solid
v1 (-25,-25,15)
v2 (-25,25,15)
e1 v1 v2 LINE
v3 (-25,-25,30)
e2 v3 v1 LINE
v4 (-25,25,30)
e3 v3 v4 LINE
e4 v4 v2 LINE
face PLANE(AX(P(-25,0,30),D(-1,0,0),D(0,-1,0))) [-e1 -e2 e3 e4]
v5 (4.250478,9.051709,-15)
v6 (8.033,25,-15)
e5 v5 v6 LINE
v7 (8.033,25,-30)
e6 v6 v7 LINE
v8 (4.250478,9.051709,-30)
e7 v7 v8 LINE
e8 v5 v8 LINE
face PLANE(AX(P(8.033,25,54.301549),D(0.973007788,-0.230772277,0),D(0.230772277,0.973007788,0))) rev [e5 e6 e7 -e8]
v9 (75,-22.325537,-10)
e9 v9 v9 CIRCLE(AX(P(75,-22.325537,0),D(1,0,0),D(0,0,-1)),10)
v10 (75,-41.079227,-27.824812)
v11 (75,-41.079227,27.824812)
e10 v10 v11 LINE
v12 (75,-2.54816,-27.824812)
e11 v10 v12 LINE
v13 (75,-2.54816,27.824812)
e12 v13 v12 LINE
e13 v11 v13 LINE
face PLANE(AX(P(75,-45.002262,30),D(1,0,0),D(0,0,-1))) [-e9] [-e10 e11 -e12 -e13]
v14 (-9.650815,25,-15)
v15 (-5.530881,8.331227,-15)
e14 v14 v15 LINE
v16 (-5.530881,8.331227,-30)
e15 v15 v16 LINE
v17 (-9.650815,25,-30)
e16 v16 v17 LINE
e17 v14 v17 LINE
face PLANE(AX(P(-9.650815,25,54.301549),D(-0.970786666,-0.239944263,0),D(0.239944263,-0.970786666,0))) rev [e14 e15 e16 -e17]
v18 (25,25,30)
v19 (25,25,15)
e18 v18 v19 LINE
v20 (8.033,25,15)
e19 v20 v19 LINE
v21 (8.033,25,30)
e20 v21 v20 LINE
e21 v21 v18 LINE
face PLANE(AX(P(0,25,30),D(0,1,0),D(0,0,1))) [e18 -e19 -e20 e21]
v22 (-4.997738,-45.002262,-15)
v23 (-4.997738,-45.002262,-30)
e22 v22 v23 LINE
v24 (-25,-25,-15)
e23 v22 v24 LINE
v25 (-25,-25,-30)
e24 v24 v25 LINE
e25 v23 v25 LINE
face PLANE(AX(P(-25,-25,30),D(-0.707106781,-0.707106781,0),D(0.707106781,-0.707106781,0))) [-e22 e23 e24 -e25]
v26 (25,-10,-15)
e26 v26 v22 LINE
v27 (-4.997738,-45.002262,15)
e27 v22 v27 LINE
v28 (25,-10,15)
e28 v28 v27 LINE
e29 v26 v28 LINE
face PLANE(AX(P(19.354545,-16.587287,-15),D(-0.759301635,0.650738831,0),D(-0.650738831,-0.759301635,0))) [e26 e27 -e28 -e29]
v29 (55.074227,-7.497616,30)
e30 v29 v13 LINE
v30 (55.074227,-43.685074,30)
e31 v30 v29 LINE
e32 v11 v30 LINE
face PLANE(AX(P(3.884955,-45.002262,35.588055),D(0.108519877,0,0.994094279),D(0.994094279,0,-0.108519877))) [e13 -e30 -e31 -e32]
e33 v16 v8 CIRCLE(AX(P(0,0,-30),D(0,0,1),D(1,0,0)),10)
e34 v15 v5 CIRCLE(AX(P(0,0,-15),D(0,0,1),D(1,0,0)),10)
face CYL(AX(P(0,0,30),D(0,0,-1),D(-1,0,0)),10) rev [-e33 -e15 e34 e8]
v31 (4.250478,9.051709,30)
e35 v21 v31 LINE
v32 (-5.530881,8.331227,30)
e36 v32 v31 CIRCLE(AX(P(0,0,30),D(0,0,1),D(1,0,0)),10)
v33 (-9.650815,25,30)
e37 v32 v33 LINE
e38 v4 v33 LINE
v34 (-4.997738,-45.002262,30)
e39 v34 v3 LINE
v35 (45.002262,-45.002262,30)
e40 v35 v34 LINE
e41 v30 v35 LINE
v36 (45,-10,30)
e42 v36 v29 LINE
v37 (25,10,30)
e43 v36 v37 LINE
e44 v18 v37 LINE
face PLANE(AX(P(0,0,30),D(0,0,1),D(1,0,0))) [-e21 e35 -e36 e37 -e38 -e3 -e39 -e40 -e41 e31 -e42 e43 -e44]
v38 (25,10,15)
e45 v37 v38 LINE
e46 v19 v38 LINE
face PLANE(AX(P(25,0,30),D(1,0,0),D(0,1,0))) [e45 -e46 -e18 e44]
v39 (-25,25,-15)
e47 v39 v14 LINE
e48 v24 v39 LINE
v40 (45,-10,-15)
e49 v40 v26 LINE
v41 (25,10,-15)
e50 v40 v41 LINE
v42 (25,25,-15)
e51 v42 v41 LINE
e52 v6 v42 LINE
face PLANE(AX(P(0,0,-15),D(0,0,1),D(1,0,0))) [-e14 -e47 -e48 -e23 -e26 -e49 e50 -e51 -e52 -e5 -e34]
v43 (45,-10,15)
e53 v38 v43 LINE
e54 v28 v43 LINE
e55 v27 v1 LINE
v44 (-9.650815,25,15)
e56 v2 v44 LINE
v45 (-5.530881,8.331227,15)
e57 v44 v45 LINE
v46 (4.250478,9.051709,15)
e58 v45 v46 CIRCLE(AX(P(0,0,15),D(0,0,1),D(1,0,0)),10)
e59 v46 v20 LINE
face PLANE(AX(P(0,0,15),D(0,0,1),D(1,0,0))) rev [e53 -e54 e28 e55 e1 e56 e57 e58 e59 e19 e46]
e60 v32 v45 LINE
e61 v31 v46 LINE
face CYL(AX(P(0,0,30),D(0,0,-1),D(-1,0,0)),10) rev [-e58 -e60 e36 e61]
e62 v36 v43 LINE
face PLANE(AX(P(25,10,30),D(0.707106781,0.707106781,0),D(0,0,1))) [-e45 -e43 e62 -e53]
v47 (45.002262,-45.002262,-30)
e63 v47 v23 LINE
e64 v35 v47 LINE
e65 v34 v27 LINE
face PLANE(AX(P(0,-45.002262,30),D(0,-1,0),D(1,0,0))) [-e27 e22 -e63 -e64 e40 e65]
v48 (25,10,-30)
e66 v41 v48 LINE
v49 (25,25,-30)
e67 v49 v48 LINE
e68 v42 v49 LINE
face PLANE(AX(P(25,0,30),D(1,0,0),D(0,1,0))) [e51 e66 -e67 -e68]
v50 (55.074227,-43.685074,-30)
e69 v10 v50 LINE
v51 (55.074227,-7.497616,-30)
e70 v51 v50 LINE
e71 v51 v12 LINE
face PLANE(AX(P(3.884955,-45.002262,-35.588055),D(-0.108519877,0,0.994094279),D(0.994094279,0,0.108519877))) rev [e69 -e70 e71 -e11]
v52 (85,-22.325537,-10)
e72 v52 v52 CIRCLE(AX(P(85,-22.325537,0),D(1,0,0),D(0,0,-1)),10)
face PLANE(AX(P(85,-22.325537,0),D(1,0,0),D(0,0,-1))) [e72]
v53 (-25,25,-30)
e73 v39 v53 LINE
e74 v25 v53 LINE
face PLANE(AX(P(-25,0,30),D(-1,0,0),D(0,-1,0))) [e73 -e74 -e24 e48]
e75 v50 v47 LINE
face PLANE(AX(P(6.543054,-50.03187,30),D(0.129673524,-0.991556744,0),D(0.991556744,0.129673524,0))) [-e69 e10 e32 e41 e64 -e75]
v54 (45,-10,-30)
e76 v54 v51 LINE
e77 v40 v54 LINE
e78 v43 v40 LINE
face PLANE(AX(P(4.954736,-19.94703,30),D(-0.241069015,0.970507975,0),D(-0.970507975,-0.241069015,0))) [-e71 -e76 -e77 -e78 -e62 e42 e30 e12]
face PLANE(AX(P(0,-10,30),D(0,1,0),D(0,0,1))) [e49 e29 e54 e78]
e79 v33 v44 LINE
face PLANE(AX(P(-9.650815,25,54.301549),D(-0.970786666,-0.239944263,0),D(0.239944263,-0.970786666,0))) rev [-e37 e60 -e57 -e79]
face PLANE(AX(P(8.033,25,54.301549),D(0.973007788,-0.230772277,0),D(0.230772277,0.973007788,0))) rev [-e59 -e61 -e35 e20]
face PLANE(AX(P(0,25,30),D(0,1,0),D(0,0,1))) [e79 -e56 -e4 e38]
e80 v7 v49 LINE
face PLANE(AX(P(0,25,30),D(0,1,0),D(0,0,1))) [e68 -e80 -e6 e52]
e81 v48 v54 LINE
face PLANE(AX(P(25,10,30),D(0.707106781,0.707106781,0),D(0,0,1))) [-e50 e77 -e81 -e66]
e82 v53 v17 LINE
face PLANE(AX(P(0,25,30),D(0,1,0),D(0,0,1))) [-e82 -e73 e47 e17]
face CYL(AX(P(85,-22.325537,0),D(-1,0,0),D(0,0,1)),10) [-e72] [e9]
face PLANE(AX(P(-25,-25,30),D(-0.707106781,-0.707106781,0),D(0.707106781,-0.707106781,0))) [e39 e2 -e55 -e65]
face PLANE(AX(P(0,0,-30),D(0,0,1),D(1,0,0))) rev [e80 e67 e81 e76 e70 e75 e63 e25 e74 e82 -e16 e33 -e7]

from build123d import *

# Parameters (mm, degrees)
SKETCH1_R               = 10
BOSS_EXTRUDE2_DEPTH     = 30
SKETCH4_R               = 10
CUT_EXTRUDE1_DEPTH      = 15
CHAMFER1_SIZE           = 20
CUT_EXTRUDE2_DEPTH      = 174.638139858
CUT_EXTRUDE2_DEPTH_BACK = 174.638139858
BOSS_EXTRUDE3_DEPTH     = 45
CUT_EXTRUDE3_DEPTH      = 198.547978004
CUT_EXTRUDE3_DEPTH_BACK = 15
SKETCH6_3_R             = 9
SKETCH8_W               = 15
SKETCH8_H               = 36
BOSS_EXTRUDE4_DEPTH     = 45.000002
SKETCH10_R              = 9
CUT_EXTRUDE4_DEPTH      = 198.547978004
BOSS_EXTRUDE5_DEPTH     = 10
CHAMFER2_SIZE           = 12
CUT_EXTRUDE5_DEPTH      = 40
CUT_EXTRUDE6_DEPTH      = 217.852953896
CUT_EXTRUDE6_DEPTH_BACK = 217.852953896
SKETCH14_OUTSIDE_W      = 287.488
SKETCH14_OUTSIDE_H      = 112.488
SKETCH14_OUTSIDE_W_2    = 100
SKETCH14_OUTSIDE_H_2    = 60
SKETCH15_R              = 10
BOSS_EXTRUDE6_DEPTH     = 10
CUT_EXTRUDE7_REACH      = 115.359


# Some blends are built 0.0001 mm under size
with BuildPart() as part:
    # Sketch1 → Boss-Extrude2 (new, symmetric)
    # profile 1 of 3: a face of its own
    with BuildSketch(Plane.XY):
        Polygon((25, -10), (-4.997737685, -45.002262315), (-25, -25), (-25, 25), (25, 25), align=None)
        Circle(SKETCH1_R, mode=Mode.SUBTRACT)
    # profile 2 of 3: a face of its own
    with BuildSketch(Plane.XY):
        Polygon((45, -10), (25, -10), (-4.997737685, -45.002262315), (45.002262315, -45.002262315), (75, -41.079226753), (75, -2.548159698), align=None)
    # profile 3 of 3: a face of its own
    with BuildSketch(Plane.XY):
        Polygon((130, 11.113547523), (75, -2.548159698), (75, -41.079226753), (130, -33.886452477), (165, -33.886452477), (165, 11.113547523), align=None)
    extrude(amount=BOSS_EXTRUDE2_DEPTH, both=True)

    # Sketch4 → Cut-Extrude1 (cut, symmetric)
    with BuildSketch(Plane.XY):
        Polygon((25, -10), (-4.997737685, -45.002262315), (-25, -25), (-25, 25), (25, 25), align=None)
        Circle(SKETCH4_R, mode=Mode.SUBTRACT)
    extrude(amount=CUT_EXTRUDE1_DEPTH, both=True, mode=Mode.SUBTRACT)

    # Chamfer1
    chamfer1_edges = [part.edges().sort_by_distance(p)[0] for p in [
        (25, -10, -22.5),
        (25, -10, 22.5),
    ]]
    chamfer(chamfer1_edges, length=CHAMFER1_SIZE - 0.0001)  # a hair under: the kernel refuses the full size

    # Sketch5 → Cut-Extrude2 (cut, two sides: drawn at the far end of the back side and taken through both)
    with BuildSketch(Plane(origin=(0, 0, 0), x_dir=(1, 0, 0), z_dir=(0, 1, 0)).offset(-CUT_EXTRUDE2_DEPTH_BACK)):
        Polygon((165, -30), (165, -18), (55.074227224, -30), align=None)
        Polygon((165, 18), (165, 30), (55.074227224, 30), align=None)
    extrude(amount=CUT_EXTRUDE2_DEPTH + CUT_EXTRUDE2_DEPTH_BACK, mode=Mode.SUBTRACT)

    # Sketch6 → Boss-Extrude3 (add)
    with BuildSketch(Plane(origin=(165, 0, 0), x_dir=(0, 0, -1), z_dir=(1, 0, 0))):
        with BuildLine():
            Line((-18, -33.886452477), (18, -33.886452477))
            Line((18, -33.886452477), (18, -17.886452477))
            ThreePointArc((18, -17.886452477), (0, -25.375680921), (-18, -17.886452477))
            Line((-18, -17.886452477), (-18, -33.886452477))
        make_face()
    extrude(amount=BOSS_EXTRUDE3_DEPTH)

    # Sketch6<3> → Cut-Extrude3 (cut, two sides: drawn at the far end of the back side and taken through both)
    with BuildSketch(Plane(origin=(165, 0, 0), x_dir=(0, 0, -1), z_dir=(1, 0, 0)).offset(-CUT_EXTRUDE3_DEPTH_BACK)):
        with Locations(Location((0, -1.886452477, 0), (0, 0, 90))):
            Circle(SKETCH6_3_R)
    extrude(amount=CUT_EXTRUDE3_DEPTH + CUT_EXTRUDE3_DEPTH_BACK, mode=Mode.SUBTRACT)

    # Sketch8 → Boss-Extrude4 (add)
    with BuildSketch(Plane.XZ.offset(33.886452477)):
        with Locations((202.5, 0)):
            Rectangle(SKETCH8_W, SKETCH8_H)
    extrude(amount=-BOSS_EXTRUDE4_DEPTH)

    # Sketch10 → Cut-Extrude4 (cut, through all)
    with BuildSketch(Plane(origin=(165, 0, 0), x_dir=(0, 0, -1), z_dir=(1, 0, 0))):
        with Locations(Location((0, -1.886452477, 0), (0, 0, 90))):
            Circle(SKETCH10_R)
    extrude(amount=CUT_EXTRUDE4_DEPTH, mode=Mode.SUBTRACT)

    # Sketch11 → Boss-Extrude5 (add)
    with BuildSketch(Plane.XZ.offset(33.886452477)):
        Polygon((130, 21.82076004), (130, -21.82076004), (165, -18), (210, -18), (210, 18), (165, 18), align=None)
    extrude(amount=BOSS_EXTRUDE5_DEPTH)

    # Chamfer2
    # the kernel refuses this chamfer: 12 mm, written as the material it takes off along each edge
    with BuildSketch(Plane(origin=(130, -43.886452477, 52.680955896), x_dir=(-0.02749587661058907, 0.9996219169112965, 0), z_dir=(0, 0, -1))) as chamfer2_piece_1_section:
        Polygon((CHAMFER2_SIZE * 0.999621916911, CHAMFER2_SIZE * 0.0274958766106), (-CHAMFER2_SIZE * 0.0274958766106, CHAMFER2_SIZE * 0.999621916911), (0, 0), align=None)
    chamfer2_piece_1 = extrude(amount=105.361911791, mode=Mode.PRIVATE)
    chamfer2_piece_1 = split(chamfer2_piece_1, bisect_by=Plane(origin=(133.216907805, -33.465752628, 0), z_dir=(0.1296735244167249, -0.9915567442488328, 0)), keep=Keep.TOP, mode=Mode.PRIVATE)
    add(chamfer2_piece_1, mode=Mode.SUBTRACT)

    # Sketch13 → Cut-Extrude5 (cut)
    with BuildSketch(Plane.XY.offset(18)):
        with BuildLine():
            Line((165, -17.886452477), (195, -17.886452477))
            ThreePointArc((195, -17.886452477), (180, -25.224548687), (165, -17.886452477))
        make_face()
    extrude(amount=-CUT_EXTRUDE5_DEPTH, mode=Mode.SUBTRACT)

    # Sketch14 outside → Cut-Extrude6 (cut, two sides: drawn at the far end of the back side and taken through both)
    with BuildSketch(Plane(origin=(0, 0, 0), x_dir=(1, 0, 0), z_dir=(0, 1, 0)).offset(-CUT_EXTRUDE6_DEPTH_BACK)):
        with Locations((92.5, 0)):
            Rectangle(SKETCH14_OUTSIDE_W, SKETCH14_OUTSIDE_H)
        with Locations((25, 0)):
            Rectangle(SKETCH14_OUTSIDE_W_2, SKETCH14_OUTSIDE_H_2, mode=Mode.SUBTRACT)
    extrude(amount=CUT_EXTRUDE6_DEPTH + CUT_EXTRUDE6_DEPTH_BACK, mode=Mode.SUBTRACT)

    # Sketch15 → Boss-Extrude6 (add)
    with BuildSketch(Plane(origin=(75, 0, 0), x_dir=(0, 0, -1), z_dir=(1, 0, 0))):
        with Locations((0, -22.3255367)):
            Circle(SKETCH15_R)
    extrude(amount=BOSS_EXTRUDE6_DEPTH)

    # Cut-Extrude7: up to this face of the body (flat: up to its plane)
    cut_extrude7_end = Plane(part.part.faces().sort_by_distance((12.358249011, -13.375403826, 30))[0])
    # Sketch16 → Cut-Extrude7 (cut, up to the picked face)
    with BuildSketch(Plane(origin=(0, 0, -30), x_dir=(-1, 0, 0), z_dir=(0, 0, -1)), mode=Mode.PRIVATE) as cut_extrude7_sk1:
        with BuildLine():
            Line((-8.033000326, 25), (-4.250478251, 9.051708935))
            ThreePointArc((-4.250478251, 9.051708935), (0.734596104, 9.972981929), (5.530881389, 8.331227464))
            Line((5.530881389, 8.331227464), (9.650814715, 25))
            Line((9.650814715, 25), (-8.033000326, 25))
        make_face()
    cut_extrude7_tool1 = split(extrude(cut_extrude7_sk1.sketch, amount=-CUT_EXTRUDE7_REACH, mode=Mode.PRIVATE), bisect_by=cut_extrude7_end, keep=Keep.BOTH, mode=Mode.PRIVATE)
    add(cut_extrude7_tool1.solids().sort_by(Axis((-0.802445, 17.957811, -30), (0, 0, 1)))[0], mode=Mode.SUBTRACT)


solid = part.part
